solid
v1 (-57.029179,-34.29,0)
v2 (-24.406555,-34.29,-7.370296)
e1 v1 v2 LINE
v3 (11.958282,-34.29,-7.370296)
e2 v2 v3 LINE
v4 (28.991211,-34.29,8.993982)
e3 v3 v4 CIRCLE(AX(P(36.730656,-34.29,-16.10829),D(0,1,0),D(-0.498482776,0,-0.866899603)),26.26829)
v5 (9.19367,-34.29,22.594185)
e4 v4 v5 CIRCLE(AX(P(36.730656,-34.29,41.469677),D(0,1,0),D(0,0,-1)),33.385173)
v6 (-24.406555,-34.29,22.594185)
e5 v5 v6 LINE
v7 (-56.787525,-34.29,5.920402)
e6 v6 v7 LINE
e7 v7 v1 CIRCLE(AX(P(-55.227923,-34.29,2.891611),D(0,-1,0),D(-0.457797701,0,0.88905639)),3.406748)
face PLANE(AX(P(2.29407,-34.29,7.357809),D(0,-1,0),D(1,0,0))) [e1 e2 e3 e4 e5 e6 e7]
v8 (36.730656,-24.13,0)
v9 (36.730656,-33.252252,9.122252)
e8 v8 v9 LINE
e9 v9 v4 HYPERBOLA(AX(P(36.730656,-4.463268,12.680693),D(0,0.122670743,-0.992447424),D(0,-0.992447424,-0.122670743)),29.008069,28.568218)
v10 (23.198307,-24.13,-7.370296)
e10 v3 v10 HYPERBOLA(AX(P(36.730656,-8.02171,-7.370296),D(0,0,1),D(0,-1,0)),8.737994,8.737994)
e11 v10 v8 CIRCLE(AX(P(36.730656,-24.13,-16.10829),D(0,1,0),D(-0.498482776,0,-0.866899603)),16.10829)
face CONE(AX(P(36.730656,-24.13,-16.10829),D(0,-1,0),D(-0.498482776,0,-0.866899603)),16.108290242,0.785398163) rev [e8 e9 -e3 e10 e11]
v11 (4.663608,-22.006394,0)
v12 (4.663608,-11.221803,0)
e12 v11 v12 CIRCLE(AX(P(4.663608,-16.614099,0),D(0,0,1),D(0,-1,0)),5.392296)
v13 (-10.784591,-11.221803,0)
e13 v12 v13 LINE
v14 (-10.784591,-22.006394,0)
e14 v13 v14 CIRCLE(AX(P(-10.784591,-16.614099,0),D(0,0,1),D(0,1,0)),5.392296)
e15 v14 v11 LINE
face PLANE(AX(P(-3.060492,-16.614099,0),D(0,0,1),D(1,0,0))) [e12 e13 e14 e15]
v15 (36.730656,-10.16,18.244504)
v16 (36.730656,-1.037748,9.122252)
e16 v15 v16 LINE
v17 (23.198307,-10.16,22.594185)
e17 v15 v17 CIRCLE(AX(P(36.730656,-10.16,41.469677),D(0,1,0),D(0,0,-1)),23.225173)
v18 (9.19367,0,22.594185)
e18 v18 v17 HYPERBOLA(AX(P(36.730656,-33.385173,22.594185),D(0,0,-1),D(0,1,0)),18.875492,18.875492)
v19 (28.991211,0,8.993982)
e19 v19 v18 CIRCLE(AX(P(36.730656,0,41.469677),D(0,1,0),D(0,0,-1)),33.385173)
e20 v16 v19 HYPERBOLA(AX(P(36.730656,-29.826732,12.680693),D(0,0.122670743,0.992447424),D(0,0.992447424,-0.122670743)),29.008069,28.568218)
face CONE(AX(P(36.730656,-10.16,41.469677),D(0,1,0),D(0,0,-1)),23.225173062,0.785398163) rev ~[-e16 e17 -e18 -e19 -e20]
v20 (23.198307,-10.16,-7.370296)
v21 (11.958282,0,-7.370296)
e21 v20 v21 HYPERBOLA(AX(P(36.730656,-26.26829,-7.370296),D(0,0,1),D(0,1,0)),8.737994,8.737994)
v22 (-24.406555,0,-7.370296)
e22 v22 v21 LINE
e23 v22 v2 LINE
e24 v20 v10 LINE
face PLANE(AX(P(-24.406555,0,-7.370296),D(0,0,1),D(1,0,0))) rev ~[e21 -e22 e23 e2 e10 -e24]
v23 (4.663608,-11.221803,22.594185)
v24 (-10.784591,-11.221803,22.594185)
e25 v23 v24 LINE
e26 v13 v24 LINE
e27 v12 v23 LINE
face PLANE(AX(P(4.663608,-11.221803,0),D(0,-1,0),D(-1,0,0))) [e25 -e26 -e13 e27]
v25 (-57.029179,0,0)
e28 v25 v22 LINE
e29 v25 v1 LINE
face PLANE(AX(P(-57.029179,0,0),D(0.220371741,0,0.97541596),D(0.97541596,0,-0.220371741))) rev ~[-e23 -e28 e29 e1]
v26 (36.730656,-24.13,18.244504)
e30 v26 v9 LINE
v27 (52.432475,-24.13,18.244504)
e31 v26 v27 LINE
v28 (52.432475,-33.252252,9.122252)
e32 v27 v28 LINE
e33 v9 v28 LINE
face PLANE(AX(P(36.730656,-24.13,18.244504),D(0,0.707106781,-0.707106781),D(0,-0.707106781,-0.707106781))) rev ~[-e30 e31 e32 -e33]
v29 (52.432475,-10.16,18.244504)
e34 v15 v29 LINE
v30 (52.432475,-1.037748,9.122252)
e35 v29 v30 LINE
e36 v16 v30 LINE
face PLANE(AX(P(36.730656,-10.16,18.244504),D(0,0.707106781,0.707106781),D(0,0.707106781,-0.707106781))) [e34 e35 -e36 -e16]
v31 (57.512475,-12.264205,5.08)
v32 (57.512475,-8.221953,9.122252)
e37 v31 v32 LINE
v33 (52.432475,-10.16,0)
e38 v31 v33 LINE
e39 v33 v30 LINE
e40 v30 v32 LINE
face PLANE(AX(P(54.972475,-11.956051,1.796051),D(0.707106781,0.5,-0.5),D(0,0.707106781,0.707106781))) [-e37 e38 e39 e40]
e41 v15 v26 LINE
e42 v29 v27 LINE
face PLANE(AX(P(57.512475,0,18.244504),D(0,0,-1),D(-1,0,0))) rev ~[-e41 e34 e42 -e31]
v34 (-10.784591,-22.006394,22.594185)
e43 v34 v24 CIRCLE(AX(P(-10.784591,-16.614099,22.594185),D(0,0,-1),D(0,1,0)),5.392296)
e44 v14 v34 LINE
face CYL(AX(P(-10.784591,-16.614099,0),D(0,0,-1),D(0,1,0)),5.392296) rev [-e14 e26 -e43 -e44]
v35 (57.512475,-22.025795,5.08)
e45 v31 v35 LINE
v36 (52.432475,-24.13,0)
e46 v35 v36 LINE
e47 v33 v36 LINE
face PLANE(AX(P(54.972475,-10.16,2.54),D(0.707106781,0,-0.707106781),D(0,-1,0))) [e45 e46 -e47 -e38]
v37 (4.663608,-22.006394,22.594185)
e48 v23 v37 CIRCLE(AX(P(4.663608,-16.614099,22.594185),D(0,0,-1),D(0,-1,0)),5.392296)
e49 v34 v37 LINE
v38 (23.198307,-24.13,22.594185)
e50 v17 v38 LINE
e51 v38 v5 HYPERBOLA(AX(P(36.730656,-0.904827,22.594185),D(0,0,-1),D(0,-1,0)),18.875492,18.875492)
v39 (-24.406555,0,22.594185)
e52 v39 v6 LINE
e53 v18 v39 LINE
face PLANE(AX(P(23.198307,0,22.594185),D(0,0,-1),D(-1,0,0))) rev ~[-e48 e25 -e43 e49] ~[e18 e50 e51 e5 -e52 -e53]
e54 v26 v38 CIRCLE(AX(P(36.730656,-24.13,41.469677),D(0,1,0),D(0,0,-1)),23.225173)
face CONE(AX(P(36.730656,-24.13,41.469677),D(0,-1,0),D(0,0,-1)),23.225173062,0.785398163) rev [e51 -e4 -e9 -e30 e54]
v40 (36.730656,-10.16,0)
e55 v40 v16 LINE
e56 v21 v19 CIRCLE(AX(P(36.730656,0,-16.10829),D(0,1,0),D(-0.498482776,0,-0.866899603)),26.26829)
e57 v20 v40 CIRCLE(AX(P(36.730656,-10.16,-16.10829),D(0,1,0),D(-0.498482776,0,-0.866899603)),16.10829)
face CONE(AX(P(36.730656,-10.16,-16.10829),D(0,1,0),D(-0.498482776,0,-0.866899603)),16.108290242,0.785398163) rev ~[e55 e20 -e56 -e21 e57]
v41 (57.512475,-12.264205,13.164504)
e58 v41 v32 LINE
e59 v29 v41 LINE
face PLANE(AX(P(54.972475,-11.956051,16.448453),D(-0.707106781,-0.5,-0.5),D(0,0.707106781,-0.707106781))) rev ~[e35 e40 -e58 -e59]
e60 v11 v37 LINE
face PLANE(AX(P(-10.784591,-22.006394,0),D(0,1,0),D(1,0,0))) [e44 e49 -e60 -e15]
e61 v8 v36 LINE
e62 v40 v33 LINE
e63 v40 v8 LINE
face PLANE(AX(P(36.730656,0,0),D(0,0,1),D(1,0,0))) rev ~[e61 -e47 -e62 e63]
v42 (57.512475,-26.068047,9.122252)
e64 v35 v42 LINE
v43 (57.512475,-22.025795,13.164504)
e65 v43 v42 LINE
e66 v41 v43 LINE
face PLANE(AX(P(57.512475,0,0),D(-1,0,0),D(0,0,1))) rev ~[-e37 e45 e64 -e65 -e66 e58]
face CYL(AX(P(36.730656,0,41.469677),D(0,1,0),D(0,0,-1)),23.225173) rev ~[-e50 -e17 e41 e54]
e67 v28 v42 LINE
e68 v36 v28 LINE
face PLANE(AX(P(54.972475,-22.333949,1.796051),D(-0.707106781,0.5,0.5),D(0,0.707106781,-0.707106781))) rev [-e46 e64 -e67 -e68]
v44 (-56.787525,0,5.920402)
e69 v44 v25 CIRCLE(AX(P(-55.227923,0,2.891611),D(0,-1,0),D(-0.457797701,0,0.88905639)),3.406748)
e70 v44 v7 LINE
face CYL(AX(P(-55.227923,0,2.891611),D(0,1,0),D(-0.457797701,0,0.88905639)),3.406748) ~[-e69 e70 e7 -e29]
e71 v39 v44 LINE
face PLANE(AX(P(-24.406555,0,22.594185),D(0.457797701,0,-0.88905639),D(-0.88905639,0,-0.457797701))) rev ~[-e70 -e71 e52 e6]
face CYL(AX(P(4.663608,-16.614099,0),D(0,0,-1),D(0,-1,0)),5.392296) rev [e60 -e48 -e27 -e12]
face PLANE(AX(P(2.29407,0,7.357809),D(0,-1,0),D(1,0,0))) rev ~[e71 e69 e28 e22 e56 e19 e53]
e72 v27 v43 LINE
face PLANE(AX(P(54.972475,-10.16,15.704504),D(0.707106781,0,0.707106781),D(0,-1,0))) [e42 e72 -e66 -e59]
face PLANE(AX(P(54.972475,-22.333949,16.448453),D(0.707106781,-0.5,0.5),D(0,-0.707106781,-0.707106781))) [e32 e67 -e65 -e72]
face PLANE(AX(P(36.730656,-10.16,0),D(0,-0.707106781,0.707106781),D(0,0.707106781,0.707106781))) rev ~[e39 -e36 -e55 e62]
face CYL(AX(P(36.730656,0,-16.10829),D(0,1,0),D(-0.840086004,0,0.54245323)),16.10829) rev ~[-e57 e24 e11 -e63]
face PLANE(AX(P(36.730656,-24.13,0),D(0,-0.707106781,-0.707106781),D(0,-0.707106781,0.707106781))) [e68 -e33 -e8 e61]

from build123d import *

# Parameters (mm, degrees)
F1_DEPTH     = 34.29
F2_T1_DEPTH  = 46.9101181819
F2_T4_ANGLE  = 100.0995199097
F2_T6_ANGLE  = 150.1003280787
F2_T8_ANGLE  = 150.1003280787
F2_T10_ANGLE = 100.0995199097
F4_DEPTH     = 64.008
F5_SIZE      = 5.08


# Not quite as in the source:
# - a fillet or chamfer that OpenCascade refuses, or shapes differently, is made with other operations: its cross-section is extruded or revolved along the edge and cut away or added


with BuildPart() as f1:
    # F0 (on Front) → F1 (new body)
    with BuildSketch(Plane.XZ):
        with BuildLine():
            Line((23.1983069149, 22.5941853283), (-24.4065547209, 22.5941853283))
            Line((-24.4065547209, 22.5941853283), (-56.7875248861, 5.9204018954))
            ThreePointArc((-56.7875248861, 5.9204018954), (-58.6318372817, 3.0305487818), (-57.02917908, 0))
            Line((-57.02917908, 0), (-24.4065547209, -7.3702961741))
            Line((-24.4065547209, -7.3702961741), (23.1983069149, -7.3702961741))
            ThreePointArc((23.1983069149, -7.3702961741), (29.0260188517, -1.9620688543), (36.7306560898, 0))
            Line((36.7306560898, 0), (57.5124751139, 0))
            Line((57.5124751139, 0), (57.5124751139, 18.2445040364))
            Line((57.5124751139, 18.2445040364), (36.7306560898, 18.2445040364))
            ThreePointArc((36.7306560898, 18.2445040364), (29.6235434283, 19.3586478737), (23.1983069149, 22.5941853283))
        make_face()
    extrude(amount=F1_DEPTH)

    # F2: chamfer of 10.16 on 4 edges, made by hand

    # F2_s2 → F2_t1 (cut)
    with BuildSketch(Plane.YZ.offset(36.7306560898)):
        Polygon((-24.13, 18.2445040364), (-34.29, 8.0845040364), (-34.29, 18.2445040364), align=None)
        Polygon((-24.13, 0), (-34.29, 10.16), (-34.29, 0), align=None)
        Polygon((-10.16, 0), (0, 10.16), (0, 0), align=None)
        Polygon((-10.16, 18.2445040364), (0, 8.0845040364), (0, 18.2445040364), align=None)
    extrude(amount=F2_T1_DEPTH, mode=Mode.SUBTRACT)

    # F2_s3 → F2_t4 (revolve, cut)
    with BuildSketch(Plane.YZ.offset(36.7306560898)):
        Polygon((-10.16, 18.2445040364), (0, 8.0845040364), (0, 18.2445040364), align=None)
    revolve(axis=Axis((36.7306560898, 0, 41.469677098), (0, 1, 0)), revolution_arc=F2_T4_ANGLE, mode=Mode.SUBTRACT)

    # F2_s5 → F2_t6 (revolve, cut)
    with BuildSketch(Plane(origin=(34.5645844349, 0, -19.8752542161), x_dir=(0, 1, 0), z_dir=(0.8668996033, 0, -0.4984827758))):
        Polygon((-10.16, -11.7629612563), (0, -21.9229612563), (0, -11.7629612563), align=None)
    revolve(axis=Axis((36.7306560898, 0, -16.1082902421), (0, 1, 0)), revolution_arc=F2_T6_ANGLE, mode=Mode.SUBTRACT)

    # F2_s7 → F2_t8 (revolve, cut)
    with BuildSketch(Plane(origin=(34.5645844349, 0, -19.8752542161), x_dir=(0, 1, 0), z_dir=(0.8668996033, 0, -0.4984827758))):
        Polygon((-24.13, -11.7629612563), (-34.29, -21.9229612563), (-34.29, -11.7629612563), align=None)
    revolve(axis=Axis((36.7306560898, -34.29, -16.1082902421), (0, 1, 0)), revolution_arc=F2_T8_ANGLE, mode=Mode.SUBTRACT)

    # F2_s9 → F2_t10 (revolve, cut)
    with BuildSketch(Plane.YZ.offset(36.7306560898)):
        Polygon((-24.13, 18.2445040364), (-34.29, 8.0845040364), (-34.29, 18.2445040364), align=None)
    revolve(axis=Axis((36.7306560898, -34.29, 41.469677098), (0, 1, 0)), revolution_arc=F2_T10_ANGLE, mode=Mode.SUBTRACT)

    # F3 (on Top) → F4 (cut)
    with BuildSketch(Plane.XY):
        with BuildLine():
            Line((4.6636075713, -11.2218027934), (-10.7845906168, -11.2218027934))
            ThreePointArc((-10.7845906168, -11.2218027934), (-16.1768863909, -16.6140985675), (-10.7845906168, -22.0063943416))
            Line((-10.7845906168, -22.0063943416), (4.6636075713, -22.0063943416))
            ThreePointArc((4.6636075713, -22.0063943416), (10.0559033453, -16.6140985675), (4.6636075713, -11.2218027934))
        make_face()
    extrude(amount=F4_DEPTH, mode=Mode.SUBTRACT)

    # F5
    f5_edges = [f1.edges().sort_by_distance(p)[0] for p in [
        (57.512475, -28.691126, 13.683378),
        (57.512475, -17.145, 18.244504),
        (57.512475, -5.598874, 13.683378),
        (57.512475, -17.145, 0),
        (57.512475, -28.691126, 4.561126),
        (57.512475, -5.598874, 4.561126),
    ]]
    chamfer(f5_edges, length=F5_SIZE)


solid = f1.part
